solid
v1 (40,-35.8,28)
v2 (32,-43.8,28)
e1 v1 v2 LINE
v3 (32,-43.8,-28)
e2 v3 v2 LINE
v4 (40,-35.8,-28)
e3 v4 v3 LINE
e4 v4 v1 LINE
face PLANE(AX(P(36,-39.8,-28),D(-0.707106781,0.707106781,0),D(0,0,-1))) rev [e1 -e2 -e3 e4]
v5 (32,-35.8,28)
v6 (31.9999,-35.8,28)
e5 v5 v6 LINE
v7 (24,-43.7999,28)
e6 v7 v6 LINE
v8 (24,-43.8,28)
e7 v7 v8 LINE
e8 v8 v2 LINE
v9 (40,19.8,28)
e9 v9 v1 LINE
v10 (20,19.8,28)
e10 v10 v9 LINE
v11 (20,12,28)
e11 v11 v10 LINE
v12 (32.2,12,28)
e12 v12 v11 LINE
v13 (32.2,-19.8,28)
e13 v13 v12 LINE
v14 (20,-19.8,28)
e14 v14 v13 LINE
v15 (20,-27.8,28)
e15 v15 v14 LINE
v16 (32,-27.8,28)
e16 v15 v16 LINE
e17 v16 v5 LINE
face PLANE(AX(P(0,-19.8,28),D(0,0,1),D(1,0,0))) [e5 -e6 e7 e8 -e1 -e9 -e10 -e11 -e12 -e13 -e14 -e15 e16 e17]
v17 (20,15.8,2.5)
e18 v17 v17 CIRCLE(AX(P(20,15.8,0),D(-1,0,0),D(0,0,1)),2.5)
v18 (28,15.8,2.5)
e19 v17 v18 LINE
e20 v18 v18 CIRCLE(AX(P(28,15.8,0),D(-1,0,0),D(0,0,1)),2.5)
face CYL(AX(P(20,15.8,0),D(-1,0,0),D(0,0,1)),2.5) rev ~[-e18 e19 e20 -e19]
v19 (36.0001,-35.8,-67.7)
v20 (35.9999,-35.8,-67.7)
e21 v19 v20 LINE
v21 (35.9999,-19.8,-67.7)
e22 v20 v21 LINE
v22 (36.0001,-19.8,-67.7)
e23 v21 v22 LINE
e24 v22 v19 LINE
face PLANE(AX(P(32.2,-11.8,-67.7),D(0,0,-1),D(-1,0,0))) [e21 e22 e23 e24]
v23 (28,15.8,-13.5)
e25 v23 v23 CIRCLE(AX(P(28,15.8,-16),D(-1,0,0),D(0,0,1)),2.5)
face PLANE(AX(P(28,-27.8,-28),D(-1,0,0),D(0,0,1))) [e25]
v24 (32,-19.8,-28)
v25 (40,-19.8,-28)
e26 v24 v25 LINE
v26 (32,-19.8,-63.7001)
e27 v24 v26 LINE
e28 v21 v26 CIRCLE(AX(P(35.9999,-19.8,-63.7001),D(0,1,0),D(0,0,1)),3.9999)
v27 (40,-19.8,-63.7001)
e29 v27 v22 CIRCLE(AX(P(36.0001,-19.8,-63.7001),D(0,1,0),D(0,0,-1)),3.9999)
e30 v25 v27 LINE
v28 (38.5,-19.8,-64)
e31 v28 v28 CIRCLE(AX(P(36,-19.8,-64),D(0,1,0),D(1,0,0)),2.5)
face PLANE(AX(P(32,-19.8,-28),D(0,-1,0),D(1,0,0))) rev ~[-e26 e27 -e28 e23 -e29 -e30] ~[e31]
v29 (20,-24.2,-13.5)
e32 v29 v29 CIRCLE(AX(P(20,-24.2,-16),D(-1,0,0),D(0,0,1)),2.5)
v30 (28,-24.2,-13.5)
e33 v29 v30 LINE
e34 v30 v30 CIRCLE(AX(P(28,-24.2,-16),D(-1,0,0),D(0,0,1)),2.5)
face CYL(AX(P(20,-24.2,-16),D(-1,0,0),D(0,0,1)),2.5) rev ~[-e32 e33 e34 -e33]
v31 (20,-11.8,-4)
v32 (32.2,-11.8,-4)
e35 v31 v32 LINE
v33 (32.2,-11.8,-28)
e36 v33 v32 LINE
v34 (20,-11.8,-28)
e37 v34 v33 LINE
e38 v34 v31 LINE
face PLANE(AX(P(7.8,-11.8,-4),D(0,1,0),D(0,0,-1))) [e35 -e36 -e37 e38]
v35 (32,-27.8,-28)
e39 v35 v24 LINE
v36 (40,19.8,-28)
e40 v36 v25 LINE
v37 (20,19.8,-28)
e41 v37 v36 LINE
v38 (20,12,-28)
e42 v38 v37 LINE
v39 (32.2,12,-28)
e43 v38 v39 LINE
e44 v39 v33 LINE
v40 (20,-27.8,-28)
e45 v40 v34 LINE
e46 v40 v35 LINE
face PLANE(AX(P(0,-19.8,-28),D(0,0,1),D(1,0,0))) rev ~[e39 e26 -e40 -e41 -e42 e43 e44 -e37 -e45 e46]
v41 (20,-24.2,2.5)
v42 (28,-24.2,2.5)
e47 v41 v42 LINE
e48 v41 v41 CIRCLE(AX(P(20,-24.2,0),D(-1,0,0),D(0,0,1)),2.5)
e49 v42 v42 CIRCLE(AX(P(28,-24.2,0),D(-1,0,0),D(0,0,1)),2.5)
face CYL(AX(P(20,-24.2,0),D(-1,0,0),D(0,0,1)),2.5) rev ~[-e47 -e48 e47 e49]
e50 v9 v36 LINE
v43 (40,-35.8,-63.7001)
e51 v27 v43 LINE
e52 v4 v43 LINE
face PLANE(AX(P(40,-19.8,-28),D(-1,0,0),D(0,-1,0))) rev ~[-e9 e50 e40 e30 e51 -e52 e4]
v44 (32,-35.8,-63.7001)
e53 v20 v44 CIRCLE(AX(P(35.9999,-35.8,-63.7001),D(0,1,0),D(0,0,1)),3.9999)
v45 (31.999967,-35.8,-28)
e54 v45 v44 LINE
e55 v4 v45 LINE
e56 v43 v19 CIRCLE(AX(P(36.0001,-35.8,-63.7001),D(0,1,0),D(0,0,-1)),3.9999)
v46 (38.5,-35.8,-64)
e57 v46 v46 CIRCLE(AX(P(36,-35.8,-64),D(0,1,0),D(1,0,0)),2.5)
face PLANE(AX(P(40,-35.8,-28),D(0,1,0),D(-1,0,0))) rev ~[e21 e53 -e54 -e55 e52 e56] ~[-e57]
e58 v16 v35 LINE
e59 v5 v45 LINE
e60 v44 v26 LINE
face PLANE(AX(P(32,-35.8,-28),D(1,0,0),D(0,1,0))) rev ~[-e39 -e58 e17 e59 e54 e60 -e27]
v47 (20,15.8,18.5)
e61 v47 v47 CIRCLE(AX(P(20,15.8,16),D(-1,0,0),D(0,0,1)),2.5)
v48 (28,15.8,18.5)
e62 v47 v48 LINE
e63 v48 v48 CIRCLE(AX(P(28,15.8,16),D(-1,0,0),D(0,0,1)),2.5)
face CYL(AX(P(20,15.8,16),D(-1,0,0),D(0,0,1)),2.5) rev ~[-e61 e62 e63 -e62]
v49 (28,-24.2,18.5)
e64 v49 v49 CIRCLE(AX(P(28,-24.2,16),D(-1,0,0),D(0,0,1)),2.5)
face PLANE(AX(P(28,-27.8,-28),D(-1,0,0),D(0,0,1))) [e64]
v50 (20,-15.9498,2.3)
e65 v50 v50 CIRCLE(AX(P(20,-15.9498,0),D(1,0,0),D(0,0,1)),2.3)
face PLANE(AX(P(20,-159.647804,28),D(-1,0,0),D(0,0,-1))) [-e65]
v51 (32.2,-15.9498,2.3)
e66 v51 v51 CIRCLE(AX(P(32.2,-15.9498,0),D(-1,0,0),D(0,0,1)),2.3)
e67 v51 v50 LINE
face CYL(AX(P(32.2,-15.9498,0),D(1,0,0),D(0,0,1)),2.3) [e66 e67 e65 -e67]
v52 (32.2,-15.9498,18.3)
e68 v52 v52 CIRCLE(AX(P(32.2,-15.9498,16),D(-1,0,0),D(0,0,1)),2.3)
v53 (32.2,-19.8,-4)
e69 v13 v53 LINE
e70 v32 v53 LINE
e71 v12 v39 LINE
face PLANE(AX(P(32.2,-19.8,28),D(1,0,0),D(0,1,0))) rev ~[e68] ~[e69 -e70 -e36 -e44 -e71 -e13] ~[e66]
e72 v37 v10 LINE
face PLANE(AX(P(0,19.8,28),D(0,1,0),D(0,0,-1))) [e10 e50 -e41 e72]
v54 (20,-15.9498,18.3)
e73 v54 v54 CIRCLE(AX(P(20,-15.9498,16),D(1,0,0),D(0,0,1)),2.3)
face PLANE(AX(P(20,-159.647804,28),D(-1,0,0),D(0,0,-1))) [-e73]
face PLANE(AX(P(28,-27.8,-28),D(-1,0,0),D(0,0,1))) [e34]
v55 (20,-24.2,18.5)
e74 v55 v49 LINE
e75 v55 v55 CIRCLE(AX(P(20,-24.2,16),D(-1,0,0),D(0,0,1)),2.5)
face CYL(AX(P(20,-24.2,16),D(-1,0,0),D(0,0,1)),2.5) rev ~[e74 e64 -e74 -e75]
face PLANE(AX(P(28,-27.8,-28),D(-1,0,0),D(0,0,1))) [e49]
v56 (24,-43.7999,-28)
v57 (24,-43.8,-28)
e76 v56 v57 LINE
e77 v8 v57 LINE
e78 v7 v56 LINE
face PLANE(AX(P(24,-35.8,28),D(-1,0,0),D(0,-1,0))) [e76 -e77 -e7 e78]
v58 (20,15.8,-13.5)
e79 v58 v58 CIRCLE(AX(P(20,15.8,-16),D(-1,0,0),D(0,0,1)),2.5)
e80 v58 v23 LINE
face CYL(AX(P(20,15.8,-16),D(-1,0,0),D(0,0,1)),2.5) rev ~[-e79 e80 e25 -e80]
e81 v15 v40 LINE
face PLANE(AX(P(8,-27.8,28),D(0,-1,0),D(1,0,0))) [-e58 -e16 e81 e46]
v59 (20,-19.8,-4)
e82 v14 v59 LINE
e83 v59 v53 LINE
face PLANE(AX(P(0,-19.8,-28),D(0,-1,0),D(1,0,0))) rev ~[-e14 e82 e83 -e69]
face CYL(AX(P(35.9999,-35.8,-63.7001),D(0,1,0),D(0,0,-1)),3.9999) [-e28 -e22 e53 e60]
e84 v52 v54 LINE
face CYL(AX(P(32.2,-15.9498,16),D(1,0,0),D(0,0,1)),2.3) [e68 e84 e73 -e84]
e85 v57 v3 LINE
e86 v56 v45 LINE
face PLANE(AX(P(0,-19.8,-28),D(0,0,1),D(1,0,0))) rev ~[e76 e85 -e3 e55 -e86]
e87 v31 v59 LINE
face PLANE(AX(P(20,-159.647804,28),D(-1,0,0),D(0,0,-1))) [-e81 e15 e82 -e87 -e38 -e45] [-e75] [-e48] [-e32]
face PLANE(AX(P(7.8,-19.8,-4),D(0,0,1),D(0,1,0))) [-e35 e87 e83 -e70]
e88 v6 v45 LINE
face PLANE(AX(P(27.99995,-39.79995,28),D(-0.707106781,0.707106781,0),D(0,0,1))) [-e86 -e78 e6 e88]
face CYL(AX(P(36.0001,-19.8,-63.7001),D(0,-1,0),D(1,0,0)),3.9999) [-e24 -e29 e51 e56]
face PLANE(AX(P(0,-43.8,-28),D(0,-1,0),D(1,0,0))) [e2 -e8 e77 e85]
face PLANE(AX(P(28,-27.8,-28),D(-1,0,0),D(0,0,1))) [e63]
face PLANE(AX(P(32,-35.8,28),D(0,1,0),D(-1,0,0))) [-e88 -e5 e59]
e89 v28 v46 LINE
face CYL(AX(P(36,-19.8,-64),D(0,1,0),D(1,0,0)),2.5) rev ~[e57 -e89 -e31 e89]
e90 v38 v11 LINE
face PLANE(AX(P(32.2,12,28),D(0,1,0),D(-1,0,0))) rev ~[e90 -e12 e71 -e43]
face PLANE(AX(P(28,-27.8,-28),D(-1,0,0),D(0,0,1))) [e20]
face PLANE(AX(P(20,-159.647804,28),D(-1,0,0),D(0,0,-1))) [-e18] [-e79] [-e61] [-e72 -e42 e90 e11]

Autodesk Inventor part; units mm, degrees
ref_plane "YZ Plane" through (0, 0, 0) normal (1, 0, 0) x (0, 1, 0)
ref_plane "XZ Plane" through (0, 0, 0) normal (0, 1, 0) x (-1, 0, 0)
ref_plane "XY Plane" through (0, 0, 0) normal (0, 0, 1) x (1, 0, 0)
sketch "Sketch1" plane through (0, 0, 0) normal (1, 0, 0) x (0, 1, 0)
  line L0 (-19.8, 28) -> (19.8, 28)
  line L1 (19.8, 28) -> (19.8, -28)
  line L2 (19.8, -28) -> (-19.8, -28)
  line L3 (-19.8, -28) -> (-19.8, 28)
  line L4 (-19.8, 28) -> (19.8, -28) construction
  line L5 (19.8, 28) -> (-19.8, -28) construction
  point P0 (0, 0)
  dimension "d0" = 39.6
  dimension "d1" = 56
extrude "Extrusion1" add sketch "Sketch1" along normal blind 40
sketch "Sketch2" plane through (0, -19.8, 28) normal (0, 0, 1) x (1, 0, 0)
  line L0 (7.8, 0) -> (32.2, 0)
  line L1 (32.2, 0) -> (32.2, 31.8)
  line L2 (32.2, 31.8) -> (7.8, 31.8)
  line L3 (7.8, 31.8) -> (7.8, 0)
  line L4 (0, 0) -> (40, 0) projected
  line L5 (40, 39.6) -> (40, 0) projected
  dimension "d4" = 24.4
  dimension "d5" = 31.8
  dimension "d6" = 7.8
extrude "Extrusion2" cut sketch "Sketch2" against normal blind 64
sketch "Sketch3" plane through (32.2, -19.8, 28) normal (-1, 0, 0) x (0, 0, 1)
  circle A0 centre (-12, 3.8502) radius 2.3
  circle A1 centre (-28, 3.8502) radius 2.3
  line L0 (0, 31.8) -> (0, 0) projected
  point P0 (-28, 19.8)
  dimension "d9" = 4.6
  dimension "d10" = 4.6
  dimension "d11" = 16
  dimension "d12" = 12
extrude "Extrusion3" add sketch "Sketch3" along normal blind 26
sketch "Sketch4" plane through (7.8, -19.8, 28) normal (1, 0, 0) x (0, 0, -1)
  line L0 (56, 0) -> (0, 0) projected
  line L1 (56, 0) -> (32, 0)
  line L2 (32, 0) -> (32, 8)
  line L3 (32, 8) -> (56, 8)
  line L4 (56, 8) -> (56, 0)
  point P0 (28, 19.8)
  point P1 (32, 0)
  dimension "d15" = 24
  dimension "d16" = 8
extrude "Extrusion4" add sketch "Sketch4" along normal blind 26
sketch "Sketch14" plane through (0, 19.8, 28) normal (0, 1, 0) x (1, 0, 0)
  line L0 (20, 0) -> (20, 56) projected
  point P0 (0, 28)
sketch "Sketch15" plane through (0, -19.8, -28) normal (0, -1, 0) x (1, 0, 0)
  line L0 (40, 0) -> (40, 56) projected
  line L1 (0, 0) -> (40, 0) projected
  line L2 (0, 56) -> (40, 56) projected
  line L3 (0, 0) -> (0, 56) projected
  point P0 (0, 28)
extrude "Extrusion7" add sketch "Sketch15" along normal blind 24
sketch "Sketch16" plane through (0, 19.8, 28) normal (0, 0, 1) x (1, 0, 0)
  line L0 (8, -47.6) -> (32, -47.6)
  line L1 (32, -47.6) -> (32, -55.6)
  line L2 (32, -55.6) -> (8, -55.6)
  line L3 (8, -55.6) -> (8, -47.6)
  line L4 (40, -63.6) -> (0, -63.6) projected
  line L5 (0, 0) -> (0, -63.6) projected
  line L6 (16, -55.6) -> (24, -55.6)
  line L7 (24, -55.6) -> (24, -63.6)
  line L8 (24, -63.6) -> (16, -63.6)
  line L9 (16, -63.6) -> (16, -55.6)
  point P0 (0, -19.8)
  dimension "d37" = 24
  dimension "d38" = 8
  dimension "d39" = 8
  dimension "d40" = 8
  dimension "d41" = 8
  dimension "d42" = 8
  dimension "d43" = 16
extrude "Extrusion8" cut sketch "Sketch16" against normal through all
chamfer "Chamfer1" distance 8 angle 45 2 edges at (40, -43.8, 0) (0, -43.8, 0)
chamfer "Chamfer2" distance 8 angle 45 2 edges at (16, -35.8, 0) (24, -35.8, 0)
split body "Split2" sketch "Sketch14" result one side removed curves L0 removed pieces at (0.5, -17.2667, 9.3333)
sketch "Sketch17" plane through (20, -27.8, -28) normal (-1, 0, 0) x (0, 0, 1)
  circle A0 centre (12, 3.6) radius 2.5
  circle A1 centre (28, 3.6) radius 2.5
  circle A2 centre (44, 3.6) radius 2.5
  circle A3 centre (12, 43.6) radius 2.5
  circle A4 centre (44, 43.6) radius 2.5
  circle A5 centre (28, 43.6) radius 2.5
  line L0 (0, 47.6) -> (56, 47.6) projected
  line L1 (0, 39.8) -> (0, 47.6) projected
  point P0 (28, 27.8)
  dimension "d52" = 5
  dimension "d53" = 5
  dimension "d55" = 5
  dimension "d56" = 5
  dimension "d57" = 5
  dimension "d58" = 5
  dimension "d59" = 16
  dimension "d60" = 16
  dimension "d61" = 40
  dimension "d62" = 4
  dimension "d63" = 12
extrude "Extrusion9" cut sketch "Sketch17" against normal blind 8
sketch "Sketch22" plane through (32.2, -11.8, -28) normal (0, 0, -1) x (-1, 0, 0)
  line L0 (0.2, -32) -> (-7.8, -24) projected
  line L1 (-7.8, -24) -> (0.2, -24)
  line L2 (0.2, -24) -> (0.2, -8)
  line L3 (0.2, -8) -> (-7.8, -8)
  line L4 (-7.8, -8) -> (-7.8, -24)
  point P0 (32.2, 11.8)
  dimension "d82" = 8
  dimension "d83" = 16
extrude "Extrusion13" add sketch "Sketch22" along normal blind 39.7
sketch "Sketch23" plane through (32, -19.8, -28) normal (0, 1, 0) x (1, 0, 0)
  circle A0 centre (4, 36) radius 2.5
  line L0 (8, 0) -> (8, 39.7) projected
  line L1 (0, 39.7) -> (8, 39.7) projected
  point P0 (-32, -28)
  dimension "d86" = 5
  dimension "d87" = 4
  dimension "d88" = 3.7
extrude "Extrusion14" cut sketch "Sketch23" against normal through all
fillet "Fillet2" radius 4 2 edges at (40, -27.8, -67.7) (32, -27.8, -67.7)
properties part number "MotorHolder_X_R"
